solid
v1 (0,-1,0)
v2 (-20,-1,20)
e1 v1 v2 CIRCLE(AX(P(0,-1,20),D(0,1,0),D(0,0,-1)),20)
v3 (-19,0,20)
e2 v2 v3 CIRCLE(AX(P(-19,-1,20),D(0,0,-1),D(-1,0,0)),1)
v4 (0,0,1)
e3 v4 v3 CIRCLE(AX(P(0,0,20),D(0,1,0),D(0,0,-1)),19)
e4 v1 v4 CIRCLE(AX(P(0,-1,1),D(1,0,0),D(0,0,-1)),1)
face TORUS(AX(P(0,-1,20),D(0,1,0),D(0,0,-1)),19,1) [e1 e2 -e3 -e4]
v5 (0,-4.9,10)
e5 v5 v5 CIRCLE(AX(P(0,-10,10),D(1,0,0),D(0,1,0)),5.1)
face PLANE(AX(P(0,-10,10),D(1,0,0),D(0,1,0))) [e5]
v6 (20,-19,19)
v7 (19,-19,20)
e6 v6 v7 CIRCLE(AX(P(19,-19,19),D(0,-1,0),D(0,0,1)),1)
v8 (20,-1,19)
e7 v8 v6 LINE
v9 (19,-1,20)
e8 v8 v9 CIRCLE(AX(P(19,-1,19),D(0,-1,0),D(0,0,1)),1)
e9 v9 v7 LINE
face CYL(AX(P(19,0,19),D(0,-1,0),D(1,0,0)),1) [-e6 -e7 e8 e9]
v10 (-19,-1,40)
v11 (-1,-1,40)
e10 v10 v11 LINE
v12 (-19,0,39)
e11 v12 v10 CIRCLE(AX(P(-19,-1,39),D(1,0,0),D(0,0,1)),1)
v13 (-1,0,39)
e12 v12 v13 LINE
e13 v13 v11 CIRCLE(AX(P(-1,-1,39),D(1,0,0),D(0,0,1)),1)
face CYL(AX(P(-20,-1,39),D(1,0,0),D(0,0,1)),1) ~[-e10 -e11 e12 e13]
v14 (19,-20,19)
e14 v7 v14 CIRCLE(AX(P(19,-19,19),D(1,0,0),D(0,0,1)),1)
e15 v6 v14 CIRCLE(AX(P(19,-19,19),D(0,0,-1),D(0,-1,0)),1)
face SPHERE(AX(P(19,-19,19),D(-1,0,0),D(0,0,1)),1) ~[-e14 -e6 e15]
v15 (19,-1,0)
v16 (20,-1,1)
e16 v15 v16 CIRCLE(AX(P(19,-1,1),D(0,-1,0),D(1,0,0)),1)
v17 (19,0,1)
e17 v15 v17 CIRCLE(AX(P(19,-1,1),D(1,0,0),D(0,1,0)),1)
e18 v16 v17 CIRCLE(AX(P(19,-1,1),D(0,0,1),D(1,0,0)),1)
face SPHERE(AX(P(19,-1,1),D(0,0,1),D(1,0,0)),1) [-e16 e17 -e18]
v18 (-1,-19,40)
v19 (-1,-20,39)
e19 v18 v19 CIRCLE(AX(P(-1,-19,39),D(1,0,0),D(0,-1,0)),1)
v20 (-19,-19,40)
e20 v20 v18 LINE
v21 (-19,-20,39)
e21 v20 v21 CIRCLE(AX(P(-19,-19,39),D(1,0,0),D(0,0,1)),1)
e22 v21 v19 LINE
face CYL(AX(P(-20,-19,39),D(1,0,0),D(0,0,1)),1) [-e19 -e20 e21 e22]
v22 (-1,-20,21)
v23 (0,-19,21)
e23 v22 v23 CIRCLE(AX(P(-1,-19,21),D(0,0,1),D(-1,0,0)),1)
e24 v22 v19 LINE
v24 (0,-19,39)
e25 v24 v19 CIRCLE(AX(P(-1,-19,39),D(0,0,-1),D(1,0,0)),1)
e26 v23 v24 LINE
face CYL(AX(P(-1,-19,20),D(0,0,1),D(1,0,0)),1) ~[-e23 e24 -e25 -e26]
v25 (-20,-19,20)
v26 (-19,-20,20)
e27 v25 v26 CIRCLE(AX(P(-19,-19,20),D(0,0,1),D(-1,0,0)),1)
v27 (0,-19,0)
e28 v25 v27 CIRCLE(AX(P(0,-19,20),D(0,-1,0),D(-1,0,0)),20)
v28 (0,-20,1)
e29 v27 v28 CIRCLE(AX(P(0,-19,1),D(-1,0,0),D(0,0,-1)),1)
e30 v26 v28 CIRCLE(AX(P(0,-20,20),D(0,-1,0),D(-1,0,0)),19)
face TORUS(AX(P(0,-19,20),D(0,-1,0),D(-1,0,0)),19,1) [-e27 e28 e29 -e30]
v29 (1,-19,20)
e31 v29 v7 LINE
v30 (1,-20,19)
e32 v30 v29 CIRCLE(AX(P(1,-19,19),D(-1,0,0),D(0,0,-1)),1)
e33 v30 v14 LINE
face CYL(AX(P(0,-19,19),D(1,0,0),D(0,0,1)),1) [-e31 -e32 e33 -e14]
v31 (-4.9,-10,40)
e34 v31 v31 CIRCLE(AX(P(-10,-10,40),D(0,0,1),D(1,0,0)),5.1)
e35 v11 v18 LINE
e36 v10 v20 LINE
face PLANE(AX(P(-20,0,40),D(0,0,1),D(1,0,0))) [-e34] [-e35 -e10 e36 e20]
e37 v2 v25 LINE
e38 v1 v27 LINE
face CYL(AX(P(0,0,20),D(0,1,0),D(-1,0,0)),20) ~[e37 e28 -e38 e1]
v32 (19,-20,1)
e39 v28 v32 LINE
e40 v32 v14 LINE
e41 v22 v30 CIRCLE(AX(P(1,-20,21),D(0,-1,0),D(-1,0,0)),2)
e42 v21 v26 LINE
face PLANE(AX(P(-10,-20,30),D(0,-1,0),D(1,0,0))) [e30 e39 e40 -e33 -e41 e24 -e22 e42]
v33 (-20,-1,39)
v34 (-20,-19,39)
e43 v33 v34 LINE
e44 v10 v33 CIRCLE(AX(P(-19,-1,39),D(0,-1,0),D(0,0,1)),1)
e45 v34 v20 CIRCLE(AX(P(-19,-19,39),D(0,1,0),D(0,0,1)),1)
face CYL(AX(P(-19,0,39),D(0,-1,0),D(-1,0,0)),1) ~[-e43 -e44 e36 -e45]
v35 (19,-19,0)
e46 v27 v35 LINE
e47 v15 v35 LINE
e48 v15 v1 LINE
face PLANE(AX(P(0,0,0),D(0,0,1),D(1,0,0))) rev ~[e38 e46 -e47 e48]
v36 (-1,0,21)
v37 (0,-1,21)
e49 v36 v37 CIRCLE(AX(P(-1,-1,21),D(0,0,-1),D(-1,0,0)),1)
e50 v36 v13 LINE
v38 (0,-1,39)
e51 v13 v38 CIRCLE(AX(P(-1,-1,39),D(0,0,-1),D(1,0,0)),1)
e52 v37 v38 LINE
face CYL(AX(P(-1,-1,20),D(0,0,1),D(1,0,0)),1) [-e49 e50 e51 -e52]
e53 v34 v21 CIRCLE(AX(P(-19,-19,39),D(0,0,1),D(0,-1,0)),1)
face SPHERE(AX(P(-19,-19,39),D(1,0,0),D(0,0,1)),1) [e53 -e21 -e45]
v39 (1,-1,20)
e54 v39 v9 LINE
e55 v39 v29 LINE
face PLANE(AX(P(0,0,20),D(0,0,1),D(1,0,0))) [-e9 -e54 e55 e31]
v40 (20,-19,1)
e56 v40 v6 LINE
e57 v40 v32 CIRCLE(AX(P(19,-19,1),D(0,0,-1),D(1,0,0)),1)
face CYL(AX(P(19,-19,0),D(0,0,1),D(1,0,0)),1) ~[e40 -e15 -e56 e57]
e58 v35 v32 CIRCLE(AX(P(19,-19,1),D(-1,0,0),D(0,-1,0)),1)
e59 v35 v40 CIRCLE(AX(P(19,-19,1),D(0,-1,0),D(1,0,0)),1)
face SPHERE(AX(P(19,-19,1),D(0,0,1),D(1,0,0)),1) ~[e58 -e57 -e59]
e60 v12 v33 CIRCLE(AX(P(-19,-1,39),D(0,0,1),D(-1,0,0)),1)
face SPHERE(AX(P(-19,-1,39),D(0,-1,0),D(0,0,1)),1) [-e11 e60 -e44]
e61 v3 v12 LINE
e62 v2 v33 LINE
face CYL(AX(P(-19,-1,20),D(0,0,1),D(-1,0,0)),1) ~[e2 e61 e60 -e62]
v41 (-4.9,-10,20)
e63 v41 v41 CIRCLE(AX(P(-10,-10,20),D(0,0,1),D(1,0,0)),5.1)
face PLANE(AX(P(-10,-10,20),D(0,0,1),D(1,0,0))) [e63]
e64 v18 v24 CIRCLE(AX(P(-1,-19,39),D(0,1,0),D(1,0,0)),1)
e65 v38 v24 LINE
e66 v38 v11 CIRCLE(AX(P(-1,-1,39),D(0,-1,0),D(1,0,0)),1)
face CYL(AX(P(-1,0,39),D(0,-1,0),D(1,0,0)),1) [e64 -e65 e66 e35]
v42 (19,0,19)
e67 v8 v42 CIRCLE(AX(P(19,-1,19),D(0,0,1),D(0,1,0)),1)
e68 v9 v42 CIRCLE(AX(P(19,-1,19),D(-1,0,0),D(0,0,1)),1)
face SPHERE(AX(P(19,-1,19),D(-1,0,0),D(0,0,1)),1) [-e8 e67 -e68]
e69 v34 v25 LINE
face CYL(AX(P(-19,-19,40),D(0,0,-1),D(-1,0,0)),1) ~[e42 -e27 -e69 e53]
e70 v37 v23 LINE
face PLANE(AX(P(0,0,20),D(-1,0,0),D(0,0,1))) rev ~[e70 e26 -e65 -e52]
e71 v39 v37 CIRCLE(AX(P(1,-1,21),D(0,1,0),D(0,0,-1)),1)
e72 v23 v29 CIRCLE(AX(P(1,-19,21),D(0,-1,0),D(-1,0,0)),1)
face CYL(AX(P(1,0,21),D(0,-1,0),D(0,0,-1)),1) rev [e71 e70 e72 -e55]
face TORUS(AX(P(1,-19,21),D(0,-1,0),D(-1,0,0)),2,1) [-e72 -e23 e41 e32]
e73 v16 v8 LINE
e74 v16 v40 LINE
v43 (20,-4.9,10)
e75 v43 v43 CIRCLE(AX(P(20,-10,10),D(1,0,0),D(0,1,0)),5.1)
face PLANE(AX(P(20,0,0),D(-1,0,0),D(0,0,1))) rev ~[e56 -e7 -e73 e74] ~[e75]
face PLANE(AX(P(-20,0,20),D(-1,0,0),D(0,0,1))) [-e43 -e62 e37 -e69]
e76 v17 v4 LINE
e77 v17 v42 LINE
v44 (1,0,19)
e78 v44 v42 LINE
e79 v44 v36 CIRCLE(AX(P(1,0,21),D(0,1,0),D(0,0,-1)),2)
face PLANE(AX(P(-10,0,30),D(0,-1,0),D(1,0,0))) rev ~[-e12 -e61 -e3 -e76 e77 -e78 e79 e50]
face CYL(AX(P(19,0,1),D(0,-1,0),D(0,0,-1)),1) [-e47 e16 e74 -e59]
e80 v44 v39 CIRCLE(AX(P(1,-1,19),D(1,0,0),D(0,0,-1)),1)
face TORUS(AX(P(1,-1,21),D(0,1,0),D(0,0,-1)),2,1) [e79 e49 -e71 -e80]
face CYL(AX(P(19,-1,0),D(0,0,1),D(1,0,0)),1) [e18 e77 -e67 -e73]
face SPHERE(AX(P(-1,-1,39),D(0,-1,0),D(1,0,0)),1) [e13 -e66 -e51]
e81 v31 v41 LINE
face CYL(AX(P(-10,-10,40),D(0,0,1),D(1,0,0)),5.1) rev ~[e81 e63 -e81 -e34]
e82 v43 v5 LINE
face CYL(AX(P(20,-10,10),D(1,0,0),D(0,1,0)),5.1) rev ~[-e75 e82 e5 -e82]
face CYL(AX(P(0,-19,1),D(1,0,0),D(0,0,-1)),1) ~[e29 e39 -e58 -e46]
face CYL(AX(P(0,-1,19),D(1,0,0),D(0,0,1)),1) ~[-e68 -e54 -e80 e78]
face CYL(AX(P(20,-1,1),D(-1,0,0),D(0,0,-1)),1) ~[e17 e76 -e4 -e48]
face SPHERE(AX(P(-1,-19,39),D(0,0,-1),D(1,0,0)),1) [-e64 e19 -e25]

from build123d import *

# Parameters (mm, degrees)
F0_W     = 20
F0_H     = 20
F1_DEPTH = 20
F2_R     = 1
F3_R     = 5.1
F4_DEPTH = 20
F5_R     = 5.1
F6_DEPTH = 20


with BuildPart() as f1:
    # F0 (on Front) → F1 (new body)
    with BuildSketch(Plane.XZ):
        with Locations((-10, 30)):
            Rectangle(F0_W, F0_H)
        with Locations((10, 10)):
            Rectangle(F0_W, F0_H)
        Polygon((-20, 20), (0, 0), (0, 20), align=None)
        with BuildLine():
            ThreePointArc((-20, 20), (-14.1421356237, 5.8578643763), (0, 0))
            Line((0, 0), (-20, 20))
        make_face()
    extrude(amount=F1_DEPTH)

    # F2
    f2_edges = [f1.edges().sort_by_distance(p)[0] for p in [
        (0, -20, 30),
        (0, -10, 40),
        (-10, -20, 40),
        (-20, -10, 40),
        (10, -20, 20),
        (10, 0, 20),
        (20, -10, 20),
        (20, -20, 10),
        (20, 0, 10),
        (20, -10, 0),
        (10, -20, 0),
        (-20, -20, 30),
        (0, 0, 30),
        (-10, 0, 40),
        (-20, 0, 30),
        (10, 0, 0),
        (-14.142136, -20, 5.857864),
        (0, -10, 20),
    ]]
    fillet(f2_edges, radius=F2_R)

    # F3 (on face) → F4 (cut)
    with BuildSketch(Plane.XY.offset(40)):
        with Locations((-10, -10)):
            Circle(F3_R)
    extrude(amount=-F4_DEPTH, mode=Mode.SUBTRACT)

    # F5 (on face) → F6 (cut)
    with BuildSketch(Plane.YZ.offset(20)):
        with Locations((-10, 10)):
            Circle(F5_R)
    extrude(amount=-F6_DEPTH, mode=Mode.SUBTRACT)


solid = f1.part
